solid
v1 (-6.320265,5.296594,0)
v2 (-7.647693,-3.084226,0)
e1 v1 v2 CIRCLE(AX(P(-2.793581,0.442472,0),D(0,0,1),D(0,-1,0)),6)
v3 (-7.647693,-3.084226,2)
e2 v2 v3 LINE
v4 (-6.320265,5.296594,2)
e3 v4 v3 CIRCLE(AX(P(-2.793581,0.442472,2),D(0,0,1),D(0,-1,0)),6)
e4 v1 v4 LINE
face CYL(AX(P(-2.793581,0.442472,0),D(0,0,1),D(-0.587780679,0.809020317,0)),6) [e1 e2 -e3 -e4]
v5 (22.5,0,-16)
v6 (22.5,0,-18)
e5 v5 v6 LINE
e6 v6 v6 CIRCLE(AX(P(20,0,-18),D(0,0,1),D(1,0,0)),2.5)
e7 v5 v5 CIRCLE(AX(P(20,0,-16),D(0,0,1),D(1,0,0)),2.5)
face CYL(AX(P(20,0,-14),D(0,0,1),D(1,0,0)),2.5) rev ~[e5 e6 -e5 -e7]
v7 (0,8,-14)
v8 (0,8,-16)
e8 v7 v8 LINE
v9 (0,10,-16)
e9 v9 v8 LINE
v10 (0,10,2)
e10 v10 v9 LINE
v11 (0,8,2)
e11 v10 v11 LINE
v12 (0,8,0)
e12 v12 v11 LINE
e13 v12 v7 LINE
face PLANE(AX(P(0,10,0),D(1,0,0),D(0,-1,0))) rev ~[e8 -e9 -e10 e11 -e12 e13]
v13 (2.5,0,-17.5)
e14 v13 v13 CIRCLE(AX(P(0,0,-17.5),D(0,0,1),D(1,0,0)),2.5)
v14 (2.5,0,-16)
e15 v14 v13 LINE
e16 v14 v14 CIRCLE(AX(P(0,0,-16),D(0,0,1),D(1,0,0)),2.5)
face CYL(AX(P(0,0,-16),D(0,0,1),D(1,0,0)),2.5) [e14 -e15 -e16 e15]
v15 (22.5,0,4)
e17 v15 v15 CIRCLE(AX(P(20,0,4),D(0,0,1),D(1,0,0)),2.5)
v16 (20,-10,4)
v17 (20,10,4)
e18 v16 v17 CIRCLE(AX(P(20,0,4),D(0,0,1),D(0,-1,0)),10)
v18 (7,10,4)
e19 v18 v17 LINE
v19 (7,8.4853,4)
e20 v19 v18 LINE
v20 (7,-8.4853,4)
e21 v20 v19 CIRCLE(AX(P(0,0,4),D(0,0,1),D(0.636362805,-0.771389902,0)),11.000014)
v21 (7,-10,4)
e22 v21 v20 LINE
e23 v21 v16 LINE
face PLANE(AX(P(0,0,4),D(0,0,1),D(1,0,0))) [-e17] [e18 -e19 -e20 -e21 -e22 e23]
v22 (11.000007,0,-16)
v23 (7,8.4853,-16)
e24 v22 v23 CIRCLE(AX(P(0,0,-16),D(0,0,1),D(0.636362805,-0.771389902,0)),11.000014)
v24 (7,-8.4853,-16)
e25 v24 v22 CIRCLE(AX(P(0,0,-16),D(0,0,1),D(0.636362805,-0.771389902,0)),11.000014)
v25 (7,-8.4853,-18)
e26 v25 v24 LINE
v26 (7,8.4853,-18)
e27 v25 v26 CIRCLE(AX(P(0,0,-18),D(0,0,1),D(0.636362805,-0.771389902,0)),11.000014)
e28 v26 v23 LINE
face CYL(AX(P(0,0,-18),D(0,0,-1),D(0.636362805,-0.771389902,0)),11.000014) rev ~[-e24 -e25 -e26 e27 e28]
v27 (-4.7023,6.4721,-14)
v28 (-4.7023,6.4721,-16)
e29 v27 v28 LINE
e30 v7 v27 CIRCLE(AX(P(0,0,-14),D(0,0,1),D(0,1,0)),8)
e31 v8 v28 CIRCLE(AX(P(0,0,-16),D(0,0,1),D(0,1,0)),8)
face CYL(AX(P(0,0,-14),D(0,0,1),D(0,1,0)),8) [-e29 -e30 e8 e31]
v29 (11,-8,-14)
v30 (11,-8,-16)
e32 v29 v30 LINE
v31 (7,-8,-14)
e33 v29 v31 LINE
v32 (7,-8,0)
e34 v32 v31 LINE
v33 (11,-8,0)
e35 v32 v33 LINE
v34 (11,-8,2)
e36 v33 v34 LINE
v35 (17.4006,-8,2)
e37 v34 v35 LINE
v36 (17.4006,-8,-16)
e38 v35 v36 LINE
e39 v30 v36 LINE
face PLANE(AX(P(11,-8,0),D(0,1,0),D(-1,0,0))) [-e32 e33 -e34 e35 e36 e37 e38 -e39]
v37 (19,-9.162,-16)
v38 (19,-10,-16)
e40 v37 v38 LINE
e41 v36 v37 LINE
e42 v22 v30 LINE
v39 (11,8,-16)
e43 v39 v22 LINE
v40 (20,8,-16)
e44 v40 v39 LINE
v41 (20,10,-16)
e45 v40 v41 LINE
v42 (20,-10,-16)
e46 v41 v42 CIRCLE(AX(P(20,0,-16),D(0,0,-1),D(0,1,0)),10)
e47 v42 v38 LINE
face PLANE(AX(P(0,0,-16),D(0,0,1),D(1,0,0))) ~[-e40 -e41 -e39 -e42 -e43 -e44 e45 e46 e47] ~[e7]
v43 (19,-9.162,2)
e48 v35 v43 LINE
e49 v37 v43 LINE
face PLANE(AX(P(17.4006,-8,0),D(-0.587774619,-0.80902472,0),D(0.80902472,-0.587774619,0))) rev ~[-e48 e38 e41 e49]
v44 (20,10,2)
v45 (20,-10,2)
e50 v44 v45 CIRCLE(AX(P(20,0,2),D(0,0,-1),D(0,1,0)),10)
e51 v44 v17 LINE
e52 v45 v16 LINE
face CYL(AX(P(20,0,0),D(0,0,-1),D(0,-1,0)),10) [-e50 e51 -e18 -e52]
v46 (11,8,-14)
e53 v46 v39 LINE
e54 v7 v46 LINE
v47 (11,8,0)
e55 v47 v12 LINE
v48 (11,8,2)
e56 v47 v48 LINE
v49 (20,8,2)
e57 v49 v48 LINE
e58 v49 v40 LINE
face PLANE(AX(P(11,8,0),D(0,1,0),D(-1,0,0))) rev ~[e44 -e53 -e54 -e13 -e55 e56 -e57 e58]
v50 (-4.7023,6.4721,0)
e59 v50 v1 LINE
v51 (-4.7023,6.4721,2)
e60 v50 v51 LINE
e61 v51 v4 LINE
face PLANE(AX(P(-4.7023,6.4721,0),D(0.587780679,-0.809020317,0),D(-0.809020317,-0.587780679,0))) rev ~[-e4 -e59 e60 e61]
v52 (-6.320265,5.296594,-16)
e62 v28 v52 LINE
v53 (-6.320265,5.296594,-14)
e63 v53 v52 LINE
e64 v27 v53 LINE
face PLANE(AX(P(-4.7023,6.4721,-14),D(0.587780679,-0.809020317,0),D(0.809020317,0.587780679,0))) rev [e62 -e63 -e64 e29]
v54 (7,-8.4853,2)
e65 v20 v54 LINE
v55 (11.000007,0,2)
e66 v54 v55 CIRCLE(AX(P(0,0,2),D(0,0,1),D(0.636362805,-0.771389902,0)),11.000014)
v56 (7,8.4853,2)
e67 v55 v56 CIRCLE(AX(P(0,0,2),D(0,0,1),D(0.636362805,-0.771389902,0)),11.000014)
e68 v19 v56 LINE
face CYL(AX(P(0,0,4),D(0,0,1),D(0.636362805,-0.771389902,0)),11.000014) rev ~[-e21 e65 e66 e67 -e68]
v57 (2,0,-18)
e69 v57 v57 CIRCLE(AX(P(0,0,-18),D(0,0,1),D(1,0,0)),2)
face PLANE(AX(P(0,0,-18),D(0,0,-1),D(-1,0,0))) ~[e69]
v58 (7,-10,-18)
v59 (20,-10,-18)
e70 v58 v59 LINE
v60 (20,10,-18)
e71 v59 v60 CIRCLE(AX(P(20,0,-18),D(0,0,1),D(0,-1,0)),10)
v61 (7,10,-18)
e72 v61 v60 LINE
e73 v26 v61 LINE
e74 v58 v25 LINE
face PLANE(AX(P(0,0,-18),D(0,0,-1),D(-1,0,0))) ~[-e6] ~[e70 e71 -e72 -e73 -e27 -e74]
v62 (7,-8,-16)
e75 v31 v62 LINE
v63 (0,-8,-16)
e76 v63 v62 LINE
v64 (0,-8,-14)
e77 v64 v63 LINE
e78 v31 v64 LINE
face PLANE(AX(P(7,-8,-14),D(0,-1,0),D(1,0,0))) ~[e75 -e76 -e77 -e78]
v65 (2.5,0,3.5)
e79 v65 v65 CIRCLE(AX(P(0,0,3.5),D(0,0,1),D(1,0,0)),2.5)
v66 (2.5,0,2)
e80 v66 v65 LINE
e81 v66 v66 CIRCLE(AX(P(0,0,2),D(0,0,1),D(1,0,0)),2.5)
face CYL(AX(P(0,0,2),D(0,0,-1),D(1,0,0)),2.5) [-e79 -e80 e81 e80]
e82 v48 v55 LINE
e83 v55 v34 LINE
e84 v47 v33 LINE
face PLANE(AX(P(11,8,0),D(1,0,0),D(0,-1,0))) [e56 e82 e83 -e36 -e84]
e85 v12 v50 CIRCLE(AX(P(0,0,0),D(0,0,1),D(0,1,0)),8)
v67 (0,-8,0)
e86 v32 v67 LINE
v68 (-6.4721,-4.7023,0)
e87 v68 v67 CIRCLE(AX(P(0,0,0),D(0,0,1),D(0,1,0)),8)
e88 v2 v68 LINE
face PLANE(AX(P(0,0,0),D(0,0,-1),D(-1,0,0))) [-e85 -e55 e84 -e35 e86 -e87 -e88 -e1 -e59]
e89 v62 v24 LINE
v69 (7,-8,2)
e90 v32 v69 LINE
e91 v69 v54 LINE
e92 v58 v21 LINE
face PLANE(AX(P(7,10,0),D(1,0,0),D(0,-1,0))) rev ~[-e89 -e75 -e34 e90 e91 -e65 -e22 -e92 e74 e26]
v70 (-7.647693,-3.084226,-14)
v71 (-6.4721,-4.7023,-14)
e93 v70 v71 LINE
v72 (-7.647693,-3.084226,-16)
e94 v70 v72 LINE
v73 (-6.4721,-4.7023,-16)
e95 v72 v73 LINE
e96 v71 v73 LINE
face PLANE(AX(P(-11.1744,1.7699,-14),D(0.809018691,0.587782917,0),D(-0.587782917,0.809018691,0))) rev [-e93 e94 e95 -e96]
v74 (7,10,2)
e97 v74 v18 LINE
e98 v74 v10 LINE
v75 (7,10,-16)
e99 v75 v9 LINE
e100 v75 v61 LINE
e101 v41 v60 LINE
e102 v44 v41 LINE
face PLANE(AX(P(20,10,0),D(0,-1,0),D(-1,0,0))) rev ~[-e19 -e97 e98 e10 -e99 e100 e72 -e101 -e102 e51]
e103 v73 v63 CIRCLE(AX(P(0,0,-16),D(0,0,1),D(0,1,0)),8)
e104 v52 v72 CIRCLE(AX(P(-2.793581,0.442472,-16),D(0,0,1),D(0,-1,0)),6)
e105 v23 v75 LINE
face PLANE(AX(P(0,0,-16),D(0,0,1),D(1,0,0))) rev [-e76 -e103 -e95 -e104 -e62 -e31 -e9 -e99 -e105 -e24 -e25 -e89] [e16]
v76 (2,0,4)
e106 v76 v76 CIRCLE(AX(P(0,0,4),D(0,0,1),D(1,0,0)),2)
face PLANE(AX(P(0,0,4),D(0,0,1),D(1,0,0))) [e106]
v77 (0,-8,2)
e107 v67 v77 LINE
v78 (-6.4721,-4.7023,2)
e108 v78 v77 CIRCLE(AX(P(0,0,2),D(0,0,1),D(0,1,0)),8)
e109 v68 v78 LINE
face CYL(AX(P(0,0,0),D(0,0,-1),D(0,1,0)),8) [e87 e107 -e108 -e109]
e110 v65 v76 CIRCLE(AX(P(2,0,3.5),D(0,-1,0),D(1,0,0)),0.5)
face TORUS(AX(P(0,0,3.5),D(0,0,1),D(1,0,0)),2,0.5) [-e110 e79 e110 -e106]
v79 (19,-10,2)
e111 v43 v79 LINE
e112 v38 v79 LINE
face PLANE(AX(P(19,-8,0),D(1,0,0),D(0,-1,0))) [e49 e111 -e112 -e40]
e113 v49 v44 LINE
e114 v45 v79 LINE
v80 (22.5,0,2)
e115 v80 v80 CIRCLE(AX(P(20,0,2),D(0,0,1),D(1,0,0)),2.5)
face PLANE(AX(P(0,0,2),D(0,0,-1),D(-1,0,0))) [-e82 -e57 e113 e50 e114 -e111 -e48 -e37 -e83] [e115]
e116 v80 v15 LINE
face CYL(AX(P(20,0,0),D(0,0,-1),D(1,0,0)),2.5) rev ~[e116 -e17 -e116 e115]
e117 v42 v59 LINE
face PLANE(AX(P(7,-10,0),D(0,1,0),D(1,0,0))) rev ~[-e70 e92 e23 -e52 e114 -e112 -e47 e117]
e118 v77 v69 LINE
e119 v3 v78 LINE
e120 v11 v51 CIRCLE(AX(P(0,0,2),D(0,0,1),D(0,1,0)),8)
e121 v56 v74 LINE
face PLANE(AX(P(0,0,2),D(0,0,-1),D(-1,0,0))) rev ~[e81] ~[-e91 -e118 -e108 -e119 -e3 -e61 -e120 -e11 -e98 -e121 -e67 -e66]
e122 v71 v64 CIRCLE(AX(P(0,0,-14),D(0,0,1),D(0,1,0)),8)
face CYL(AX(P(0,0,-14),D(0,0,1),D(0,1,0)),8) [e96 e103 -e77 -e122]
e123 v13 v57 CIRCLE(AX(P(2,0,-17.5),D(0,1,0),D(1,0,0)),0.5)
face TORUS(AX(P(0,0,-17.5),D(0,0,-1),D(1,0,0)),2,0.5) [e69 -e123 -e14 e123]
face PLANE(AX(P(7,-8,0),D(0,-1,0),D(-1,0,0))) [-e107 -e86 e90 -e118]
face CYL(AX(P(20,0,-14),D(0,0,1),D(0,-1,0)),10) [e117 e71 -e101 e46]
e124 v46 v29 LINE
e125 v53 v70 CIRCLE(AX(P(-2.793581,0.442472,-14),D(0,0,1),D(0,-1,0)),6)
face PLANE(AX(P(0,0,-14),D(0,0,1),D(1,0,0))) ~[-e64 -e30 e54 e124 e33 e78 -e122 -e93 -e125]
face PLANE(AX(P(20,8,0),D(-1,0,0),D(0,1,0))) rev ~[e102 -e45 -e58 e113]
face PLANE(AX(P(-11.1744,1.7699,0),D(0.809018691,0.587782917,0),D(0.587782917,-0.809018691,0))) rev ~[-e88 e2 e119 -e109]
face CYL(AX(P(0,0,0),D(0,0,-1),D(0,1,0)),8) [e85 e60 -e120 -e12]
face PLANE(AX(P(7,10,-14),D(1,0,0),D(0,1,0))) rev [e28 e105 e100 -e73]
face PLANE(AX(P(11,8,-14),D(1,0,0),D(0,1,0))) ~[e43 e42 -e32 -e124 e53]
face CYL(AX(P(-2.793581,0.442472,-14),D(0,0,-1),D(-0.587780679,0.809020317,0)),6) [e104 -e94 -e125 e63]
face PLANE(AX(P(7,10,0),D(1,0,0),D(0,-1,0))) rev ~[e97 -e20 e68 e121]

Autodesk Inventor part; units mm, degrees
ref_plane "YZ Plane" through (0, 0, 0) normal (1, 0, 0) x (0, 1, 0)
ref_plane "XZ Plane" through (0, 0, 0) normal (0, 1, 0) x (-1, 0, 0)
sketch "Sketch1" plane through (0, 0, 0) normal (0, 0, 1) x (1, 0, 0)
  circle A0 centre (0, 0) radius 2.5
  circle A1 centre (20, 0) radius 2.5
  line L0 (7, 10) -> (20, 10)
  line L1 (7, -10) -> (20, -10)
  arc A2 (20, -10) -> (20, 10) centre (20, 0) ccw
  line L2 (7, 10) -> (7, 8)
  line L3 (7, -10) -> (7, -8)
  line L4 (7, 8) -> (0, 8)
  line L5 (7, -8) -> (0, -8)
  arc A3 (0, 8) -> (0, -8) centre (0, 0) ccw
  dimension "d0" = 5
  dimension "d1" = 20
  dimension "d2" = 10
  dimension "d3" = 2
  dimension "d4" = 13
extrude "Extrusion1" add sketch "Sketch1" along normal blind 4
sketch "Sketch2" plane through (0, 0, 4) normal (0, 0, 1) x (1, 0, 0)
  circle A0 centre (0, 0) radius 2.5 projected
  line L0 (7, 8) -> (0, 8) projected
  arc A1 (0, 8) -> (0, -8) centre (0, 0) ccw projected
  line L1 (0, -8) -> (7, -8) projected
  line L2 (7, -10) -> (20, -10) projected
  line L3 (7, 8) -> (7, -8)
  line L4 (7, -8) -> (0, -8)
  line L5 (7, 8) -> (0, 8)
  arc A2 (0, 8) -> (0, -8) centre (0, 0) ccw
extrude "Extrusion2" cut sketch "Sketch2" against normal blind 2
sketch "Sketch3" plane through (0, 0, 0) normal (0, 0, -1) x (-1, 0, 0)
  circle A0 centre (-20, 0) radius 2.5 projected
  circle A1 centre (0, 0) radius 2.5 projected
  line L0 (-7, 10) -> (-20, 10) projected
  arc A2 (-20, 10) -> (-20, -10) centre (-20, 0) ccw projected
  line L1 (-20, -10) -> (-7, -10) projected
  line L2 (-7, 8) -> (-7, 10) projected
  line L3 (-19, 10) -> (-19, 8)
  line L4 (-19, 8) -> (-11, 8)
  line L5 (-11, 8) -> (-11, -8)
  line L6 (-11, -8) -> (-19, -8)
  line L7 (-19, -8) -> (-19, -10)
  point P0 (-7, -8)
  dimension "d9" = 1
  dimension "d10" = 11
extrude "Extrusion3" cut sketch "Sketch3" against normal blind 2 contours L3 L4 L5 L6 L7 L1 A2 L0
sketch "Sketch4" plane through (0, 0, 4) normal (0, 0, 1) x (1, 0, 0)
  line L0 (7, 10) -> (7, -10) projected
  circle A0 centre (0, 0) radius 2.5 projected
  arc A1 (7, -8.4853) -> (7, 8.4853) centre (0, 0) ccw
  dimension "d15" = 11
extrude "Extrusion4" cut sketch "Sketch4" against normal blind 2 contours A1 L0
sketch "Sketch5" plane through (0, 0, 0) normal (0, 0, -1) x (-1, 0, 0)
  line L0 (0, 8) -> (-7, 8) projected
  line L1 (-7, 10) -> (0, 10)
  line L2 (0, 10) -> (0, 8)
  line L3 (0, 8) -> (-7, 8)
  line L4 (-7, 8) -> (-7, 10)
  arc A0 (0, -8) -> (0, 8) centre (0, 0) ccw projected
extrude "Extrusion5" add sketch "Sketch5" against normal blind 2
sketch "Sketch6" plane through (0, 0, 0) normal (0, 0, -1) x (-1, 0, 0)
  line L0 (0, 10) -> (-19, 10) projected
  line L1 (-19, 8) -> (-20, 8)
  line L2 (-20, 8) -> (-20, 10)
  line L3 (-20, 10) -> (-19, 10)
  line L4 (-19, 10) -> (-19, 8)
  circle A0 centre (-20, 0) radius 2.5 projected
extrude "Extrusion6" add sketch "Sketch6" against normal blind 2 contours L1 L2 L3 L4
sketch "Sketch7" plane through (0, 0, 0) normal (0, 0, -1) x (-1, 0, 0)
  line L0 (-19, -8) -> (-19, -10) projected
  line L1 (-11, -8) -> (-19, -8) projected
  line L2 (-17.4006, -8) -> (-19, -9.162)
  line L3 (-17.4006, -8) -> (-26.8052, 4.9443) construction
  line L4 (-26.8052, 4.9443) -> (-28.4046, 3.7823) construction
  line L5 (-28.4046, 3.7823) -> (-19, -9.162) construction
  circle A0 centre (-20, 0) radius 2.5 projected
  line L6 (-17.4006, -8) -> (-19, -8)
  line L7 (-19, -8) -> (-19, -9.162)
  dimension "d21" = 16
  dimension "d22" = 8
  dimension "d23" = 36
extrude "Extrusion7" cut sketch "Sketch7" against normal blind 2 contours L1 L2 L0
sketch "Sketch9" plane through (0, 0, 2) normal (0, 0, 1) x (1, 0, 0)
  circle A0 centre (0, 0) radius 2.5 projected
  arc A1 (11, 0) -> (7, 8.4853) centre (0, 0) ccw projected
  circle A2 centre (0, 0) radius 2.5
extrude "Extrusion8" add sketch "Sketch9" along normal mid plane 4
fillet "Fillet1" radius 0.5 1 edges at (-2.5, 0, 4)
sketch "Sketch10" plane through (0, 0, 0) normal (0, 0, -1) x (-1, 0, 0)
  arc A0 (0, -8) -> (0, 8) centre (0, 0) ccw projected
  line L0 (0, 10) -> (-20, 10) projected
  line L1 (4.7023, 6.4721) -> (11.1744, 1.7699)
  line L2 (11.1744, 1.7699) -> (6.4721, -4.7023)
  dimension "d30" = 144
extrude "Extrusion9" add sketch "Sketch10" against normal blind 2
fillet "Fillet2" radius 6 1 edges at (-11.1744, 1.7699, 1)
ref_plane "Work Plane1" through (0, 0, -7) normal (0, 0, -1) x (-1, 0, 0)
mirror "Mirror1" about plane through (0, 0, -7) normal (0, 0, -1)
sketch "Sketch11" plane through (0, 0, 0) normal (0, 0, -1) x (-1, 0, 0)
  arc A0 (4.7023, 6.4721) -> (0, 8) centre (0, 0) ccw projected
  line L0 (0, 8) -> (0, 10) projected
  line L1 (0, 10) -> (-20, 10) projected
  line L2 (-20, 10) -> (-20, 8) projected
  line L3 (-20, 8) -> (-11, 8) projected
  line L4 (-11, -8) -> (-17.4006, -8) projected
  line L5 (-17.4006, -8) -> (-19, -9.162) projected
  line L6 (-19, -9.162) -> (-19, -10) projected
  line L7 (-19, -10) -> (-7, -10) projected
  line L8 (-7, -10) -> (-7, -8) projected
  line L9 (-7, -8) -> (0, -8) projected
  line L10 (-11, -8) -> (-7, -8)
  line L11 (-11, 8) -> (0, 8)
extrude "Extrusion10" add sketch "Sketch11" along normal blind 14
properties part number "cable_chain_22" material "ABS Plastic"
